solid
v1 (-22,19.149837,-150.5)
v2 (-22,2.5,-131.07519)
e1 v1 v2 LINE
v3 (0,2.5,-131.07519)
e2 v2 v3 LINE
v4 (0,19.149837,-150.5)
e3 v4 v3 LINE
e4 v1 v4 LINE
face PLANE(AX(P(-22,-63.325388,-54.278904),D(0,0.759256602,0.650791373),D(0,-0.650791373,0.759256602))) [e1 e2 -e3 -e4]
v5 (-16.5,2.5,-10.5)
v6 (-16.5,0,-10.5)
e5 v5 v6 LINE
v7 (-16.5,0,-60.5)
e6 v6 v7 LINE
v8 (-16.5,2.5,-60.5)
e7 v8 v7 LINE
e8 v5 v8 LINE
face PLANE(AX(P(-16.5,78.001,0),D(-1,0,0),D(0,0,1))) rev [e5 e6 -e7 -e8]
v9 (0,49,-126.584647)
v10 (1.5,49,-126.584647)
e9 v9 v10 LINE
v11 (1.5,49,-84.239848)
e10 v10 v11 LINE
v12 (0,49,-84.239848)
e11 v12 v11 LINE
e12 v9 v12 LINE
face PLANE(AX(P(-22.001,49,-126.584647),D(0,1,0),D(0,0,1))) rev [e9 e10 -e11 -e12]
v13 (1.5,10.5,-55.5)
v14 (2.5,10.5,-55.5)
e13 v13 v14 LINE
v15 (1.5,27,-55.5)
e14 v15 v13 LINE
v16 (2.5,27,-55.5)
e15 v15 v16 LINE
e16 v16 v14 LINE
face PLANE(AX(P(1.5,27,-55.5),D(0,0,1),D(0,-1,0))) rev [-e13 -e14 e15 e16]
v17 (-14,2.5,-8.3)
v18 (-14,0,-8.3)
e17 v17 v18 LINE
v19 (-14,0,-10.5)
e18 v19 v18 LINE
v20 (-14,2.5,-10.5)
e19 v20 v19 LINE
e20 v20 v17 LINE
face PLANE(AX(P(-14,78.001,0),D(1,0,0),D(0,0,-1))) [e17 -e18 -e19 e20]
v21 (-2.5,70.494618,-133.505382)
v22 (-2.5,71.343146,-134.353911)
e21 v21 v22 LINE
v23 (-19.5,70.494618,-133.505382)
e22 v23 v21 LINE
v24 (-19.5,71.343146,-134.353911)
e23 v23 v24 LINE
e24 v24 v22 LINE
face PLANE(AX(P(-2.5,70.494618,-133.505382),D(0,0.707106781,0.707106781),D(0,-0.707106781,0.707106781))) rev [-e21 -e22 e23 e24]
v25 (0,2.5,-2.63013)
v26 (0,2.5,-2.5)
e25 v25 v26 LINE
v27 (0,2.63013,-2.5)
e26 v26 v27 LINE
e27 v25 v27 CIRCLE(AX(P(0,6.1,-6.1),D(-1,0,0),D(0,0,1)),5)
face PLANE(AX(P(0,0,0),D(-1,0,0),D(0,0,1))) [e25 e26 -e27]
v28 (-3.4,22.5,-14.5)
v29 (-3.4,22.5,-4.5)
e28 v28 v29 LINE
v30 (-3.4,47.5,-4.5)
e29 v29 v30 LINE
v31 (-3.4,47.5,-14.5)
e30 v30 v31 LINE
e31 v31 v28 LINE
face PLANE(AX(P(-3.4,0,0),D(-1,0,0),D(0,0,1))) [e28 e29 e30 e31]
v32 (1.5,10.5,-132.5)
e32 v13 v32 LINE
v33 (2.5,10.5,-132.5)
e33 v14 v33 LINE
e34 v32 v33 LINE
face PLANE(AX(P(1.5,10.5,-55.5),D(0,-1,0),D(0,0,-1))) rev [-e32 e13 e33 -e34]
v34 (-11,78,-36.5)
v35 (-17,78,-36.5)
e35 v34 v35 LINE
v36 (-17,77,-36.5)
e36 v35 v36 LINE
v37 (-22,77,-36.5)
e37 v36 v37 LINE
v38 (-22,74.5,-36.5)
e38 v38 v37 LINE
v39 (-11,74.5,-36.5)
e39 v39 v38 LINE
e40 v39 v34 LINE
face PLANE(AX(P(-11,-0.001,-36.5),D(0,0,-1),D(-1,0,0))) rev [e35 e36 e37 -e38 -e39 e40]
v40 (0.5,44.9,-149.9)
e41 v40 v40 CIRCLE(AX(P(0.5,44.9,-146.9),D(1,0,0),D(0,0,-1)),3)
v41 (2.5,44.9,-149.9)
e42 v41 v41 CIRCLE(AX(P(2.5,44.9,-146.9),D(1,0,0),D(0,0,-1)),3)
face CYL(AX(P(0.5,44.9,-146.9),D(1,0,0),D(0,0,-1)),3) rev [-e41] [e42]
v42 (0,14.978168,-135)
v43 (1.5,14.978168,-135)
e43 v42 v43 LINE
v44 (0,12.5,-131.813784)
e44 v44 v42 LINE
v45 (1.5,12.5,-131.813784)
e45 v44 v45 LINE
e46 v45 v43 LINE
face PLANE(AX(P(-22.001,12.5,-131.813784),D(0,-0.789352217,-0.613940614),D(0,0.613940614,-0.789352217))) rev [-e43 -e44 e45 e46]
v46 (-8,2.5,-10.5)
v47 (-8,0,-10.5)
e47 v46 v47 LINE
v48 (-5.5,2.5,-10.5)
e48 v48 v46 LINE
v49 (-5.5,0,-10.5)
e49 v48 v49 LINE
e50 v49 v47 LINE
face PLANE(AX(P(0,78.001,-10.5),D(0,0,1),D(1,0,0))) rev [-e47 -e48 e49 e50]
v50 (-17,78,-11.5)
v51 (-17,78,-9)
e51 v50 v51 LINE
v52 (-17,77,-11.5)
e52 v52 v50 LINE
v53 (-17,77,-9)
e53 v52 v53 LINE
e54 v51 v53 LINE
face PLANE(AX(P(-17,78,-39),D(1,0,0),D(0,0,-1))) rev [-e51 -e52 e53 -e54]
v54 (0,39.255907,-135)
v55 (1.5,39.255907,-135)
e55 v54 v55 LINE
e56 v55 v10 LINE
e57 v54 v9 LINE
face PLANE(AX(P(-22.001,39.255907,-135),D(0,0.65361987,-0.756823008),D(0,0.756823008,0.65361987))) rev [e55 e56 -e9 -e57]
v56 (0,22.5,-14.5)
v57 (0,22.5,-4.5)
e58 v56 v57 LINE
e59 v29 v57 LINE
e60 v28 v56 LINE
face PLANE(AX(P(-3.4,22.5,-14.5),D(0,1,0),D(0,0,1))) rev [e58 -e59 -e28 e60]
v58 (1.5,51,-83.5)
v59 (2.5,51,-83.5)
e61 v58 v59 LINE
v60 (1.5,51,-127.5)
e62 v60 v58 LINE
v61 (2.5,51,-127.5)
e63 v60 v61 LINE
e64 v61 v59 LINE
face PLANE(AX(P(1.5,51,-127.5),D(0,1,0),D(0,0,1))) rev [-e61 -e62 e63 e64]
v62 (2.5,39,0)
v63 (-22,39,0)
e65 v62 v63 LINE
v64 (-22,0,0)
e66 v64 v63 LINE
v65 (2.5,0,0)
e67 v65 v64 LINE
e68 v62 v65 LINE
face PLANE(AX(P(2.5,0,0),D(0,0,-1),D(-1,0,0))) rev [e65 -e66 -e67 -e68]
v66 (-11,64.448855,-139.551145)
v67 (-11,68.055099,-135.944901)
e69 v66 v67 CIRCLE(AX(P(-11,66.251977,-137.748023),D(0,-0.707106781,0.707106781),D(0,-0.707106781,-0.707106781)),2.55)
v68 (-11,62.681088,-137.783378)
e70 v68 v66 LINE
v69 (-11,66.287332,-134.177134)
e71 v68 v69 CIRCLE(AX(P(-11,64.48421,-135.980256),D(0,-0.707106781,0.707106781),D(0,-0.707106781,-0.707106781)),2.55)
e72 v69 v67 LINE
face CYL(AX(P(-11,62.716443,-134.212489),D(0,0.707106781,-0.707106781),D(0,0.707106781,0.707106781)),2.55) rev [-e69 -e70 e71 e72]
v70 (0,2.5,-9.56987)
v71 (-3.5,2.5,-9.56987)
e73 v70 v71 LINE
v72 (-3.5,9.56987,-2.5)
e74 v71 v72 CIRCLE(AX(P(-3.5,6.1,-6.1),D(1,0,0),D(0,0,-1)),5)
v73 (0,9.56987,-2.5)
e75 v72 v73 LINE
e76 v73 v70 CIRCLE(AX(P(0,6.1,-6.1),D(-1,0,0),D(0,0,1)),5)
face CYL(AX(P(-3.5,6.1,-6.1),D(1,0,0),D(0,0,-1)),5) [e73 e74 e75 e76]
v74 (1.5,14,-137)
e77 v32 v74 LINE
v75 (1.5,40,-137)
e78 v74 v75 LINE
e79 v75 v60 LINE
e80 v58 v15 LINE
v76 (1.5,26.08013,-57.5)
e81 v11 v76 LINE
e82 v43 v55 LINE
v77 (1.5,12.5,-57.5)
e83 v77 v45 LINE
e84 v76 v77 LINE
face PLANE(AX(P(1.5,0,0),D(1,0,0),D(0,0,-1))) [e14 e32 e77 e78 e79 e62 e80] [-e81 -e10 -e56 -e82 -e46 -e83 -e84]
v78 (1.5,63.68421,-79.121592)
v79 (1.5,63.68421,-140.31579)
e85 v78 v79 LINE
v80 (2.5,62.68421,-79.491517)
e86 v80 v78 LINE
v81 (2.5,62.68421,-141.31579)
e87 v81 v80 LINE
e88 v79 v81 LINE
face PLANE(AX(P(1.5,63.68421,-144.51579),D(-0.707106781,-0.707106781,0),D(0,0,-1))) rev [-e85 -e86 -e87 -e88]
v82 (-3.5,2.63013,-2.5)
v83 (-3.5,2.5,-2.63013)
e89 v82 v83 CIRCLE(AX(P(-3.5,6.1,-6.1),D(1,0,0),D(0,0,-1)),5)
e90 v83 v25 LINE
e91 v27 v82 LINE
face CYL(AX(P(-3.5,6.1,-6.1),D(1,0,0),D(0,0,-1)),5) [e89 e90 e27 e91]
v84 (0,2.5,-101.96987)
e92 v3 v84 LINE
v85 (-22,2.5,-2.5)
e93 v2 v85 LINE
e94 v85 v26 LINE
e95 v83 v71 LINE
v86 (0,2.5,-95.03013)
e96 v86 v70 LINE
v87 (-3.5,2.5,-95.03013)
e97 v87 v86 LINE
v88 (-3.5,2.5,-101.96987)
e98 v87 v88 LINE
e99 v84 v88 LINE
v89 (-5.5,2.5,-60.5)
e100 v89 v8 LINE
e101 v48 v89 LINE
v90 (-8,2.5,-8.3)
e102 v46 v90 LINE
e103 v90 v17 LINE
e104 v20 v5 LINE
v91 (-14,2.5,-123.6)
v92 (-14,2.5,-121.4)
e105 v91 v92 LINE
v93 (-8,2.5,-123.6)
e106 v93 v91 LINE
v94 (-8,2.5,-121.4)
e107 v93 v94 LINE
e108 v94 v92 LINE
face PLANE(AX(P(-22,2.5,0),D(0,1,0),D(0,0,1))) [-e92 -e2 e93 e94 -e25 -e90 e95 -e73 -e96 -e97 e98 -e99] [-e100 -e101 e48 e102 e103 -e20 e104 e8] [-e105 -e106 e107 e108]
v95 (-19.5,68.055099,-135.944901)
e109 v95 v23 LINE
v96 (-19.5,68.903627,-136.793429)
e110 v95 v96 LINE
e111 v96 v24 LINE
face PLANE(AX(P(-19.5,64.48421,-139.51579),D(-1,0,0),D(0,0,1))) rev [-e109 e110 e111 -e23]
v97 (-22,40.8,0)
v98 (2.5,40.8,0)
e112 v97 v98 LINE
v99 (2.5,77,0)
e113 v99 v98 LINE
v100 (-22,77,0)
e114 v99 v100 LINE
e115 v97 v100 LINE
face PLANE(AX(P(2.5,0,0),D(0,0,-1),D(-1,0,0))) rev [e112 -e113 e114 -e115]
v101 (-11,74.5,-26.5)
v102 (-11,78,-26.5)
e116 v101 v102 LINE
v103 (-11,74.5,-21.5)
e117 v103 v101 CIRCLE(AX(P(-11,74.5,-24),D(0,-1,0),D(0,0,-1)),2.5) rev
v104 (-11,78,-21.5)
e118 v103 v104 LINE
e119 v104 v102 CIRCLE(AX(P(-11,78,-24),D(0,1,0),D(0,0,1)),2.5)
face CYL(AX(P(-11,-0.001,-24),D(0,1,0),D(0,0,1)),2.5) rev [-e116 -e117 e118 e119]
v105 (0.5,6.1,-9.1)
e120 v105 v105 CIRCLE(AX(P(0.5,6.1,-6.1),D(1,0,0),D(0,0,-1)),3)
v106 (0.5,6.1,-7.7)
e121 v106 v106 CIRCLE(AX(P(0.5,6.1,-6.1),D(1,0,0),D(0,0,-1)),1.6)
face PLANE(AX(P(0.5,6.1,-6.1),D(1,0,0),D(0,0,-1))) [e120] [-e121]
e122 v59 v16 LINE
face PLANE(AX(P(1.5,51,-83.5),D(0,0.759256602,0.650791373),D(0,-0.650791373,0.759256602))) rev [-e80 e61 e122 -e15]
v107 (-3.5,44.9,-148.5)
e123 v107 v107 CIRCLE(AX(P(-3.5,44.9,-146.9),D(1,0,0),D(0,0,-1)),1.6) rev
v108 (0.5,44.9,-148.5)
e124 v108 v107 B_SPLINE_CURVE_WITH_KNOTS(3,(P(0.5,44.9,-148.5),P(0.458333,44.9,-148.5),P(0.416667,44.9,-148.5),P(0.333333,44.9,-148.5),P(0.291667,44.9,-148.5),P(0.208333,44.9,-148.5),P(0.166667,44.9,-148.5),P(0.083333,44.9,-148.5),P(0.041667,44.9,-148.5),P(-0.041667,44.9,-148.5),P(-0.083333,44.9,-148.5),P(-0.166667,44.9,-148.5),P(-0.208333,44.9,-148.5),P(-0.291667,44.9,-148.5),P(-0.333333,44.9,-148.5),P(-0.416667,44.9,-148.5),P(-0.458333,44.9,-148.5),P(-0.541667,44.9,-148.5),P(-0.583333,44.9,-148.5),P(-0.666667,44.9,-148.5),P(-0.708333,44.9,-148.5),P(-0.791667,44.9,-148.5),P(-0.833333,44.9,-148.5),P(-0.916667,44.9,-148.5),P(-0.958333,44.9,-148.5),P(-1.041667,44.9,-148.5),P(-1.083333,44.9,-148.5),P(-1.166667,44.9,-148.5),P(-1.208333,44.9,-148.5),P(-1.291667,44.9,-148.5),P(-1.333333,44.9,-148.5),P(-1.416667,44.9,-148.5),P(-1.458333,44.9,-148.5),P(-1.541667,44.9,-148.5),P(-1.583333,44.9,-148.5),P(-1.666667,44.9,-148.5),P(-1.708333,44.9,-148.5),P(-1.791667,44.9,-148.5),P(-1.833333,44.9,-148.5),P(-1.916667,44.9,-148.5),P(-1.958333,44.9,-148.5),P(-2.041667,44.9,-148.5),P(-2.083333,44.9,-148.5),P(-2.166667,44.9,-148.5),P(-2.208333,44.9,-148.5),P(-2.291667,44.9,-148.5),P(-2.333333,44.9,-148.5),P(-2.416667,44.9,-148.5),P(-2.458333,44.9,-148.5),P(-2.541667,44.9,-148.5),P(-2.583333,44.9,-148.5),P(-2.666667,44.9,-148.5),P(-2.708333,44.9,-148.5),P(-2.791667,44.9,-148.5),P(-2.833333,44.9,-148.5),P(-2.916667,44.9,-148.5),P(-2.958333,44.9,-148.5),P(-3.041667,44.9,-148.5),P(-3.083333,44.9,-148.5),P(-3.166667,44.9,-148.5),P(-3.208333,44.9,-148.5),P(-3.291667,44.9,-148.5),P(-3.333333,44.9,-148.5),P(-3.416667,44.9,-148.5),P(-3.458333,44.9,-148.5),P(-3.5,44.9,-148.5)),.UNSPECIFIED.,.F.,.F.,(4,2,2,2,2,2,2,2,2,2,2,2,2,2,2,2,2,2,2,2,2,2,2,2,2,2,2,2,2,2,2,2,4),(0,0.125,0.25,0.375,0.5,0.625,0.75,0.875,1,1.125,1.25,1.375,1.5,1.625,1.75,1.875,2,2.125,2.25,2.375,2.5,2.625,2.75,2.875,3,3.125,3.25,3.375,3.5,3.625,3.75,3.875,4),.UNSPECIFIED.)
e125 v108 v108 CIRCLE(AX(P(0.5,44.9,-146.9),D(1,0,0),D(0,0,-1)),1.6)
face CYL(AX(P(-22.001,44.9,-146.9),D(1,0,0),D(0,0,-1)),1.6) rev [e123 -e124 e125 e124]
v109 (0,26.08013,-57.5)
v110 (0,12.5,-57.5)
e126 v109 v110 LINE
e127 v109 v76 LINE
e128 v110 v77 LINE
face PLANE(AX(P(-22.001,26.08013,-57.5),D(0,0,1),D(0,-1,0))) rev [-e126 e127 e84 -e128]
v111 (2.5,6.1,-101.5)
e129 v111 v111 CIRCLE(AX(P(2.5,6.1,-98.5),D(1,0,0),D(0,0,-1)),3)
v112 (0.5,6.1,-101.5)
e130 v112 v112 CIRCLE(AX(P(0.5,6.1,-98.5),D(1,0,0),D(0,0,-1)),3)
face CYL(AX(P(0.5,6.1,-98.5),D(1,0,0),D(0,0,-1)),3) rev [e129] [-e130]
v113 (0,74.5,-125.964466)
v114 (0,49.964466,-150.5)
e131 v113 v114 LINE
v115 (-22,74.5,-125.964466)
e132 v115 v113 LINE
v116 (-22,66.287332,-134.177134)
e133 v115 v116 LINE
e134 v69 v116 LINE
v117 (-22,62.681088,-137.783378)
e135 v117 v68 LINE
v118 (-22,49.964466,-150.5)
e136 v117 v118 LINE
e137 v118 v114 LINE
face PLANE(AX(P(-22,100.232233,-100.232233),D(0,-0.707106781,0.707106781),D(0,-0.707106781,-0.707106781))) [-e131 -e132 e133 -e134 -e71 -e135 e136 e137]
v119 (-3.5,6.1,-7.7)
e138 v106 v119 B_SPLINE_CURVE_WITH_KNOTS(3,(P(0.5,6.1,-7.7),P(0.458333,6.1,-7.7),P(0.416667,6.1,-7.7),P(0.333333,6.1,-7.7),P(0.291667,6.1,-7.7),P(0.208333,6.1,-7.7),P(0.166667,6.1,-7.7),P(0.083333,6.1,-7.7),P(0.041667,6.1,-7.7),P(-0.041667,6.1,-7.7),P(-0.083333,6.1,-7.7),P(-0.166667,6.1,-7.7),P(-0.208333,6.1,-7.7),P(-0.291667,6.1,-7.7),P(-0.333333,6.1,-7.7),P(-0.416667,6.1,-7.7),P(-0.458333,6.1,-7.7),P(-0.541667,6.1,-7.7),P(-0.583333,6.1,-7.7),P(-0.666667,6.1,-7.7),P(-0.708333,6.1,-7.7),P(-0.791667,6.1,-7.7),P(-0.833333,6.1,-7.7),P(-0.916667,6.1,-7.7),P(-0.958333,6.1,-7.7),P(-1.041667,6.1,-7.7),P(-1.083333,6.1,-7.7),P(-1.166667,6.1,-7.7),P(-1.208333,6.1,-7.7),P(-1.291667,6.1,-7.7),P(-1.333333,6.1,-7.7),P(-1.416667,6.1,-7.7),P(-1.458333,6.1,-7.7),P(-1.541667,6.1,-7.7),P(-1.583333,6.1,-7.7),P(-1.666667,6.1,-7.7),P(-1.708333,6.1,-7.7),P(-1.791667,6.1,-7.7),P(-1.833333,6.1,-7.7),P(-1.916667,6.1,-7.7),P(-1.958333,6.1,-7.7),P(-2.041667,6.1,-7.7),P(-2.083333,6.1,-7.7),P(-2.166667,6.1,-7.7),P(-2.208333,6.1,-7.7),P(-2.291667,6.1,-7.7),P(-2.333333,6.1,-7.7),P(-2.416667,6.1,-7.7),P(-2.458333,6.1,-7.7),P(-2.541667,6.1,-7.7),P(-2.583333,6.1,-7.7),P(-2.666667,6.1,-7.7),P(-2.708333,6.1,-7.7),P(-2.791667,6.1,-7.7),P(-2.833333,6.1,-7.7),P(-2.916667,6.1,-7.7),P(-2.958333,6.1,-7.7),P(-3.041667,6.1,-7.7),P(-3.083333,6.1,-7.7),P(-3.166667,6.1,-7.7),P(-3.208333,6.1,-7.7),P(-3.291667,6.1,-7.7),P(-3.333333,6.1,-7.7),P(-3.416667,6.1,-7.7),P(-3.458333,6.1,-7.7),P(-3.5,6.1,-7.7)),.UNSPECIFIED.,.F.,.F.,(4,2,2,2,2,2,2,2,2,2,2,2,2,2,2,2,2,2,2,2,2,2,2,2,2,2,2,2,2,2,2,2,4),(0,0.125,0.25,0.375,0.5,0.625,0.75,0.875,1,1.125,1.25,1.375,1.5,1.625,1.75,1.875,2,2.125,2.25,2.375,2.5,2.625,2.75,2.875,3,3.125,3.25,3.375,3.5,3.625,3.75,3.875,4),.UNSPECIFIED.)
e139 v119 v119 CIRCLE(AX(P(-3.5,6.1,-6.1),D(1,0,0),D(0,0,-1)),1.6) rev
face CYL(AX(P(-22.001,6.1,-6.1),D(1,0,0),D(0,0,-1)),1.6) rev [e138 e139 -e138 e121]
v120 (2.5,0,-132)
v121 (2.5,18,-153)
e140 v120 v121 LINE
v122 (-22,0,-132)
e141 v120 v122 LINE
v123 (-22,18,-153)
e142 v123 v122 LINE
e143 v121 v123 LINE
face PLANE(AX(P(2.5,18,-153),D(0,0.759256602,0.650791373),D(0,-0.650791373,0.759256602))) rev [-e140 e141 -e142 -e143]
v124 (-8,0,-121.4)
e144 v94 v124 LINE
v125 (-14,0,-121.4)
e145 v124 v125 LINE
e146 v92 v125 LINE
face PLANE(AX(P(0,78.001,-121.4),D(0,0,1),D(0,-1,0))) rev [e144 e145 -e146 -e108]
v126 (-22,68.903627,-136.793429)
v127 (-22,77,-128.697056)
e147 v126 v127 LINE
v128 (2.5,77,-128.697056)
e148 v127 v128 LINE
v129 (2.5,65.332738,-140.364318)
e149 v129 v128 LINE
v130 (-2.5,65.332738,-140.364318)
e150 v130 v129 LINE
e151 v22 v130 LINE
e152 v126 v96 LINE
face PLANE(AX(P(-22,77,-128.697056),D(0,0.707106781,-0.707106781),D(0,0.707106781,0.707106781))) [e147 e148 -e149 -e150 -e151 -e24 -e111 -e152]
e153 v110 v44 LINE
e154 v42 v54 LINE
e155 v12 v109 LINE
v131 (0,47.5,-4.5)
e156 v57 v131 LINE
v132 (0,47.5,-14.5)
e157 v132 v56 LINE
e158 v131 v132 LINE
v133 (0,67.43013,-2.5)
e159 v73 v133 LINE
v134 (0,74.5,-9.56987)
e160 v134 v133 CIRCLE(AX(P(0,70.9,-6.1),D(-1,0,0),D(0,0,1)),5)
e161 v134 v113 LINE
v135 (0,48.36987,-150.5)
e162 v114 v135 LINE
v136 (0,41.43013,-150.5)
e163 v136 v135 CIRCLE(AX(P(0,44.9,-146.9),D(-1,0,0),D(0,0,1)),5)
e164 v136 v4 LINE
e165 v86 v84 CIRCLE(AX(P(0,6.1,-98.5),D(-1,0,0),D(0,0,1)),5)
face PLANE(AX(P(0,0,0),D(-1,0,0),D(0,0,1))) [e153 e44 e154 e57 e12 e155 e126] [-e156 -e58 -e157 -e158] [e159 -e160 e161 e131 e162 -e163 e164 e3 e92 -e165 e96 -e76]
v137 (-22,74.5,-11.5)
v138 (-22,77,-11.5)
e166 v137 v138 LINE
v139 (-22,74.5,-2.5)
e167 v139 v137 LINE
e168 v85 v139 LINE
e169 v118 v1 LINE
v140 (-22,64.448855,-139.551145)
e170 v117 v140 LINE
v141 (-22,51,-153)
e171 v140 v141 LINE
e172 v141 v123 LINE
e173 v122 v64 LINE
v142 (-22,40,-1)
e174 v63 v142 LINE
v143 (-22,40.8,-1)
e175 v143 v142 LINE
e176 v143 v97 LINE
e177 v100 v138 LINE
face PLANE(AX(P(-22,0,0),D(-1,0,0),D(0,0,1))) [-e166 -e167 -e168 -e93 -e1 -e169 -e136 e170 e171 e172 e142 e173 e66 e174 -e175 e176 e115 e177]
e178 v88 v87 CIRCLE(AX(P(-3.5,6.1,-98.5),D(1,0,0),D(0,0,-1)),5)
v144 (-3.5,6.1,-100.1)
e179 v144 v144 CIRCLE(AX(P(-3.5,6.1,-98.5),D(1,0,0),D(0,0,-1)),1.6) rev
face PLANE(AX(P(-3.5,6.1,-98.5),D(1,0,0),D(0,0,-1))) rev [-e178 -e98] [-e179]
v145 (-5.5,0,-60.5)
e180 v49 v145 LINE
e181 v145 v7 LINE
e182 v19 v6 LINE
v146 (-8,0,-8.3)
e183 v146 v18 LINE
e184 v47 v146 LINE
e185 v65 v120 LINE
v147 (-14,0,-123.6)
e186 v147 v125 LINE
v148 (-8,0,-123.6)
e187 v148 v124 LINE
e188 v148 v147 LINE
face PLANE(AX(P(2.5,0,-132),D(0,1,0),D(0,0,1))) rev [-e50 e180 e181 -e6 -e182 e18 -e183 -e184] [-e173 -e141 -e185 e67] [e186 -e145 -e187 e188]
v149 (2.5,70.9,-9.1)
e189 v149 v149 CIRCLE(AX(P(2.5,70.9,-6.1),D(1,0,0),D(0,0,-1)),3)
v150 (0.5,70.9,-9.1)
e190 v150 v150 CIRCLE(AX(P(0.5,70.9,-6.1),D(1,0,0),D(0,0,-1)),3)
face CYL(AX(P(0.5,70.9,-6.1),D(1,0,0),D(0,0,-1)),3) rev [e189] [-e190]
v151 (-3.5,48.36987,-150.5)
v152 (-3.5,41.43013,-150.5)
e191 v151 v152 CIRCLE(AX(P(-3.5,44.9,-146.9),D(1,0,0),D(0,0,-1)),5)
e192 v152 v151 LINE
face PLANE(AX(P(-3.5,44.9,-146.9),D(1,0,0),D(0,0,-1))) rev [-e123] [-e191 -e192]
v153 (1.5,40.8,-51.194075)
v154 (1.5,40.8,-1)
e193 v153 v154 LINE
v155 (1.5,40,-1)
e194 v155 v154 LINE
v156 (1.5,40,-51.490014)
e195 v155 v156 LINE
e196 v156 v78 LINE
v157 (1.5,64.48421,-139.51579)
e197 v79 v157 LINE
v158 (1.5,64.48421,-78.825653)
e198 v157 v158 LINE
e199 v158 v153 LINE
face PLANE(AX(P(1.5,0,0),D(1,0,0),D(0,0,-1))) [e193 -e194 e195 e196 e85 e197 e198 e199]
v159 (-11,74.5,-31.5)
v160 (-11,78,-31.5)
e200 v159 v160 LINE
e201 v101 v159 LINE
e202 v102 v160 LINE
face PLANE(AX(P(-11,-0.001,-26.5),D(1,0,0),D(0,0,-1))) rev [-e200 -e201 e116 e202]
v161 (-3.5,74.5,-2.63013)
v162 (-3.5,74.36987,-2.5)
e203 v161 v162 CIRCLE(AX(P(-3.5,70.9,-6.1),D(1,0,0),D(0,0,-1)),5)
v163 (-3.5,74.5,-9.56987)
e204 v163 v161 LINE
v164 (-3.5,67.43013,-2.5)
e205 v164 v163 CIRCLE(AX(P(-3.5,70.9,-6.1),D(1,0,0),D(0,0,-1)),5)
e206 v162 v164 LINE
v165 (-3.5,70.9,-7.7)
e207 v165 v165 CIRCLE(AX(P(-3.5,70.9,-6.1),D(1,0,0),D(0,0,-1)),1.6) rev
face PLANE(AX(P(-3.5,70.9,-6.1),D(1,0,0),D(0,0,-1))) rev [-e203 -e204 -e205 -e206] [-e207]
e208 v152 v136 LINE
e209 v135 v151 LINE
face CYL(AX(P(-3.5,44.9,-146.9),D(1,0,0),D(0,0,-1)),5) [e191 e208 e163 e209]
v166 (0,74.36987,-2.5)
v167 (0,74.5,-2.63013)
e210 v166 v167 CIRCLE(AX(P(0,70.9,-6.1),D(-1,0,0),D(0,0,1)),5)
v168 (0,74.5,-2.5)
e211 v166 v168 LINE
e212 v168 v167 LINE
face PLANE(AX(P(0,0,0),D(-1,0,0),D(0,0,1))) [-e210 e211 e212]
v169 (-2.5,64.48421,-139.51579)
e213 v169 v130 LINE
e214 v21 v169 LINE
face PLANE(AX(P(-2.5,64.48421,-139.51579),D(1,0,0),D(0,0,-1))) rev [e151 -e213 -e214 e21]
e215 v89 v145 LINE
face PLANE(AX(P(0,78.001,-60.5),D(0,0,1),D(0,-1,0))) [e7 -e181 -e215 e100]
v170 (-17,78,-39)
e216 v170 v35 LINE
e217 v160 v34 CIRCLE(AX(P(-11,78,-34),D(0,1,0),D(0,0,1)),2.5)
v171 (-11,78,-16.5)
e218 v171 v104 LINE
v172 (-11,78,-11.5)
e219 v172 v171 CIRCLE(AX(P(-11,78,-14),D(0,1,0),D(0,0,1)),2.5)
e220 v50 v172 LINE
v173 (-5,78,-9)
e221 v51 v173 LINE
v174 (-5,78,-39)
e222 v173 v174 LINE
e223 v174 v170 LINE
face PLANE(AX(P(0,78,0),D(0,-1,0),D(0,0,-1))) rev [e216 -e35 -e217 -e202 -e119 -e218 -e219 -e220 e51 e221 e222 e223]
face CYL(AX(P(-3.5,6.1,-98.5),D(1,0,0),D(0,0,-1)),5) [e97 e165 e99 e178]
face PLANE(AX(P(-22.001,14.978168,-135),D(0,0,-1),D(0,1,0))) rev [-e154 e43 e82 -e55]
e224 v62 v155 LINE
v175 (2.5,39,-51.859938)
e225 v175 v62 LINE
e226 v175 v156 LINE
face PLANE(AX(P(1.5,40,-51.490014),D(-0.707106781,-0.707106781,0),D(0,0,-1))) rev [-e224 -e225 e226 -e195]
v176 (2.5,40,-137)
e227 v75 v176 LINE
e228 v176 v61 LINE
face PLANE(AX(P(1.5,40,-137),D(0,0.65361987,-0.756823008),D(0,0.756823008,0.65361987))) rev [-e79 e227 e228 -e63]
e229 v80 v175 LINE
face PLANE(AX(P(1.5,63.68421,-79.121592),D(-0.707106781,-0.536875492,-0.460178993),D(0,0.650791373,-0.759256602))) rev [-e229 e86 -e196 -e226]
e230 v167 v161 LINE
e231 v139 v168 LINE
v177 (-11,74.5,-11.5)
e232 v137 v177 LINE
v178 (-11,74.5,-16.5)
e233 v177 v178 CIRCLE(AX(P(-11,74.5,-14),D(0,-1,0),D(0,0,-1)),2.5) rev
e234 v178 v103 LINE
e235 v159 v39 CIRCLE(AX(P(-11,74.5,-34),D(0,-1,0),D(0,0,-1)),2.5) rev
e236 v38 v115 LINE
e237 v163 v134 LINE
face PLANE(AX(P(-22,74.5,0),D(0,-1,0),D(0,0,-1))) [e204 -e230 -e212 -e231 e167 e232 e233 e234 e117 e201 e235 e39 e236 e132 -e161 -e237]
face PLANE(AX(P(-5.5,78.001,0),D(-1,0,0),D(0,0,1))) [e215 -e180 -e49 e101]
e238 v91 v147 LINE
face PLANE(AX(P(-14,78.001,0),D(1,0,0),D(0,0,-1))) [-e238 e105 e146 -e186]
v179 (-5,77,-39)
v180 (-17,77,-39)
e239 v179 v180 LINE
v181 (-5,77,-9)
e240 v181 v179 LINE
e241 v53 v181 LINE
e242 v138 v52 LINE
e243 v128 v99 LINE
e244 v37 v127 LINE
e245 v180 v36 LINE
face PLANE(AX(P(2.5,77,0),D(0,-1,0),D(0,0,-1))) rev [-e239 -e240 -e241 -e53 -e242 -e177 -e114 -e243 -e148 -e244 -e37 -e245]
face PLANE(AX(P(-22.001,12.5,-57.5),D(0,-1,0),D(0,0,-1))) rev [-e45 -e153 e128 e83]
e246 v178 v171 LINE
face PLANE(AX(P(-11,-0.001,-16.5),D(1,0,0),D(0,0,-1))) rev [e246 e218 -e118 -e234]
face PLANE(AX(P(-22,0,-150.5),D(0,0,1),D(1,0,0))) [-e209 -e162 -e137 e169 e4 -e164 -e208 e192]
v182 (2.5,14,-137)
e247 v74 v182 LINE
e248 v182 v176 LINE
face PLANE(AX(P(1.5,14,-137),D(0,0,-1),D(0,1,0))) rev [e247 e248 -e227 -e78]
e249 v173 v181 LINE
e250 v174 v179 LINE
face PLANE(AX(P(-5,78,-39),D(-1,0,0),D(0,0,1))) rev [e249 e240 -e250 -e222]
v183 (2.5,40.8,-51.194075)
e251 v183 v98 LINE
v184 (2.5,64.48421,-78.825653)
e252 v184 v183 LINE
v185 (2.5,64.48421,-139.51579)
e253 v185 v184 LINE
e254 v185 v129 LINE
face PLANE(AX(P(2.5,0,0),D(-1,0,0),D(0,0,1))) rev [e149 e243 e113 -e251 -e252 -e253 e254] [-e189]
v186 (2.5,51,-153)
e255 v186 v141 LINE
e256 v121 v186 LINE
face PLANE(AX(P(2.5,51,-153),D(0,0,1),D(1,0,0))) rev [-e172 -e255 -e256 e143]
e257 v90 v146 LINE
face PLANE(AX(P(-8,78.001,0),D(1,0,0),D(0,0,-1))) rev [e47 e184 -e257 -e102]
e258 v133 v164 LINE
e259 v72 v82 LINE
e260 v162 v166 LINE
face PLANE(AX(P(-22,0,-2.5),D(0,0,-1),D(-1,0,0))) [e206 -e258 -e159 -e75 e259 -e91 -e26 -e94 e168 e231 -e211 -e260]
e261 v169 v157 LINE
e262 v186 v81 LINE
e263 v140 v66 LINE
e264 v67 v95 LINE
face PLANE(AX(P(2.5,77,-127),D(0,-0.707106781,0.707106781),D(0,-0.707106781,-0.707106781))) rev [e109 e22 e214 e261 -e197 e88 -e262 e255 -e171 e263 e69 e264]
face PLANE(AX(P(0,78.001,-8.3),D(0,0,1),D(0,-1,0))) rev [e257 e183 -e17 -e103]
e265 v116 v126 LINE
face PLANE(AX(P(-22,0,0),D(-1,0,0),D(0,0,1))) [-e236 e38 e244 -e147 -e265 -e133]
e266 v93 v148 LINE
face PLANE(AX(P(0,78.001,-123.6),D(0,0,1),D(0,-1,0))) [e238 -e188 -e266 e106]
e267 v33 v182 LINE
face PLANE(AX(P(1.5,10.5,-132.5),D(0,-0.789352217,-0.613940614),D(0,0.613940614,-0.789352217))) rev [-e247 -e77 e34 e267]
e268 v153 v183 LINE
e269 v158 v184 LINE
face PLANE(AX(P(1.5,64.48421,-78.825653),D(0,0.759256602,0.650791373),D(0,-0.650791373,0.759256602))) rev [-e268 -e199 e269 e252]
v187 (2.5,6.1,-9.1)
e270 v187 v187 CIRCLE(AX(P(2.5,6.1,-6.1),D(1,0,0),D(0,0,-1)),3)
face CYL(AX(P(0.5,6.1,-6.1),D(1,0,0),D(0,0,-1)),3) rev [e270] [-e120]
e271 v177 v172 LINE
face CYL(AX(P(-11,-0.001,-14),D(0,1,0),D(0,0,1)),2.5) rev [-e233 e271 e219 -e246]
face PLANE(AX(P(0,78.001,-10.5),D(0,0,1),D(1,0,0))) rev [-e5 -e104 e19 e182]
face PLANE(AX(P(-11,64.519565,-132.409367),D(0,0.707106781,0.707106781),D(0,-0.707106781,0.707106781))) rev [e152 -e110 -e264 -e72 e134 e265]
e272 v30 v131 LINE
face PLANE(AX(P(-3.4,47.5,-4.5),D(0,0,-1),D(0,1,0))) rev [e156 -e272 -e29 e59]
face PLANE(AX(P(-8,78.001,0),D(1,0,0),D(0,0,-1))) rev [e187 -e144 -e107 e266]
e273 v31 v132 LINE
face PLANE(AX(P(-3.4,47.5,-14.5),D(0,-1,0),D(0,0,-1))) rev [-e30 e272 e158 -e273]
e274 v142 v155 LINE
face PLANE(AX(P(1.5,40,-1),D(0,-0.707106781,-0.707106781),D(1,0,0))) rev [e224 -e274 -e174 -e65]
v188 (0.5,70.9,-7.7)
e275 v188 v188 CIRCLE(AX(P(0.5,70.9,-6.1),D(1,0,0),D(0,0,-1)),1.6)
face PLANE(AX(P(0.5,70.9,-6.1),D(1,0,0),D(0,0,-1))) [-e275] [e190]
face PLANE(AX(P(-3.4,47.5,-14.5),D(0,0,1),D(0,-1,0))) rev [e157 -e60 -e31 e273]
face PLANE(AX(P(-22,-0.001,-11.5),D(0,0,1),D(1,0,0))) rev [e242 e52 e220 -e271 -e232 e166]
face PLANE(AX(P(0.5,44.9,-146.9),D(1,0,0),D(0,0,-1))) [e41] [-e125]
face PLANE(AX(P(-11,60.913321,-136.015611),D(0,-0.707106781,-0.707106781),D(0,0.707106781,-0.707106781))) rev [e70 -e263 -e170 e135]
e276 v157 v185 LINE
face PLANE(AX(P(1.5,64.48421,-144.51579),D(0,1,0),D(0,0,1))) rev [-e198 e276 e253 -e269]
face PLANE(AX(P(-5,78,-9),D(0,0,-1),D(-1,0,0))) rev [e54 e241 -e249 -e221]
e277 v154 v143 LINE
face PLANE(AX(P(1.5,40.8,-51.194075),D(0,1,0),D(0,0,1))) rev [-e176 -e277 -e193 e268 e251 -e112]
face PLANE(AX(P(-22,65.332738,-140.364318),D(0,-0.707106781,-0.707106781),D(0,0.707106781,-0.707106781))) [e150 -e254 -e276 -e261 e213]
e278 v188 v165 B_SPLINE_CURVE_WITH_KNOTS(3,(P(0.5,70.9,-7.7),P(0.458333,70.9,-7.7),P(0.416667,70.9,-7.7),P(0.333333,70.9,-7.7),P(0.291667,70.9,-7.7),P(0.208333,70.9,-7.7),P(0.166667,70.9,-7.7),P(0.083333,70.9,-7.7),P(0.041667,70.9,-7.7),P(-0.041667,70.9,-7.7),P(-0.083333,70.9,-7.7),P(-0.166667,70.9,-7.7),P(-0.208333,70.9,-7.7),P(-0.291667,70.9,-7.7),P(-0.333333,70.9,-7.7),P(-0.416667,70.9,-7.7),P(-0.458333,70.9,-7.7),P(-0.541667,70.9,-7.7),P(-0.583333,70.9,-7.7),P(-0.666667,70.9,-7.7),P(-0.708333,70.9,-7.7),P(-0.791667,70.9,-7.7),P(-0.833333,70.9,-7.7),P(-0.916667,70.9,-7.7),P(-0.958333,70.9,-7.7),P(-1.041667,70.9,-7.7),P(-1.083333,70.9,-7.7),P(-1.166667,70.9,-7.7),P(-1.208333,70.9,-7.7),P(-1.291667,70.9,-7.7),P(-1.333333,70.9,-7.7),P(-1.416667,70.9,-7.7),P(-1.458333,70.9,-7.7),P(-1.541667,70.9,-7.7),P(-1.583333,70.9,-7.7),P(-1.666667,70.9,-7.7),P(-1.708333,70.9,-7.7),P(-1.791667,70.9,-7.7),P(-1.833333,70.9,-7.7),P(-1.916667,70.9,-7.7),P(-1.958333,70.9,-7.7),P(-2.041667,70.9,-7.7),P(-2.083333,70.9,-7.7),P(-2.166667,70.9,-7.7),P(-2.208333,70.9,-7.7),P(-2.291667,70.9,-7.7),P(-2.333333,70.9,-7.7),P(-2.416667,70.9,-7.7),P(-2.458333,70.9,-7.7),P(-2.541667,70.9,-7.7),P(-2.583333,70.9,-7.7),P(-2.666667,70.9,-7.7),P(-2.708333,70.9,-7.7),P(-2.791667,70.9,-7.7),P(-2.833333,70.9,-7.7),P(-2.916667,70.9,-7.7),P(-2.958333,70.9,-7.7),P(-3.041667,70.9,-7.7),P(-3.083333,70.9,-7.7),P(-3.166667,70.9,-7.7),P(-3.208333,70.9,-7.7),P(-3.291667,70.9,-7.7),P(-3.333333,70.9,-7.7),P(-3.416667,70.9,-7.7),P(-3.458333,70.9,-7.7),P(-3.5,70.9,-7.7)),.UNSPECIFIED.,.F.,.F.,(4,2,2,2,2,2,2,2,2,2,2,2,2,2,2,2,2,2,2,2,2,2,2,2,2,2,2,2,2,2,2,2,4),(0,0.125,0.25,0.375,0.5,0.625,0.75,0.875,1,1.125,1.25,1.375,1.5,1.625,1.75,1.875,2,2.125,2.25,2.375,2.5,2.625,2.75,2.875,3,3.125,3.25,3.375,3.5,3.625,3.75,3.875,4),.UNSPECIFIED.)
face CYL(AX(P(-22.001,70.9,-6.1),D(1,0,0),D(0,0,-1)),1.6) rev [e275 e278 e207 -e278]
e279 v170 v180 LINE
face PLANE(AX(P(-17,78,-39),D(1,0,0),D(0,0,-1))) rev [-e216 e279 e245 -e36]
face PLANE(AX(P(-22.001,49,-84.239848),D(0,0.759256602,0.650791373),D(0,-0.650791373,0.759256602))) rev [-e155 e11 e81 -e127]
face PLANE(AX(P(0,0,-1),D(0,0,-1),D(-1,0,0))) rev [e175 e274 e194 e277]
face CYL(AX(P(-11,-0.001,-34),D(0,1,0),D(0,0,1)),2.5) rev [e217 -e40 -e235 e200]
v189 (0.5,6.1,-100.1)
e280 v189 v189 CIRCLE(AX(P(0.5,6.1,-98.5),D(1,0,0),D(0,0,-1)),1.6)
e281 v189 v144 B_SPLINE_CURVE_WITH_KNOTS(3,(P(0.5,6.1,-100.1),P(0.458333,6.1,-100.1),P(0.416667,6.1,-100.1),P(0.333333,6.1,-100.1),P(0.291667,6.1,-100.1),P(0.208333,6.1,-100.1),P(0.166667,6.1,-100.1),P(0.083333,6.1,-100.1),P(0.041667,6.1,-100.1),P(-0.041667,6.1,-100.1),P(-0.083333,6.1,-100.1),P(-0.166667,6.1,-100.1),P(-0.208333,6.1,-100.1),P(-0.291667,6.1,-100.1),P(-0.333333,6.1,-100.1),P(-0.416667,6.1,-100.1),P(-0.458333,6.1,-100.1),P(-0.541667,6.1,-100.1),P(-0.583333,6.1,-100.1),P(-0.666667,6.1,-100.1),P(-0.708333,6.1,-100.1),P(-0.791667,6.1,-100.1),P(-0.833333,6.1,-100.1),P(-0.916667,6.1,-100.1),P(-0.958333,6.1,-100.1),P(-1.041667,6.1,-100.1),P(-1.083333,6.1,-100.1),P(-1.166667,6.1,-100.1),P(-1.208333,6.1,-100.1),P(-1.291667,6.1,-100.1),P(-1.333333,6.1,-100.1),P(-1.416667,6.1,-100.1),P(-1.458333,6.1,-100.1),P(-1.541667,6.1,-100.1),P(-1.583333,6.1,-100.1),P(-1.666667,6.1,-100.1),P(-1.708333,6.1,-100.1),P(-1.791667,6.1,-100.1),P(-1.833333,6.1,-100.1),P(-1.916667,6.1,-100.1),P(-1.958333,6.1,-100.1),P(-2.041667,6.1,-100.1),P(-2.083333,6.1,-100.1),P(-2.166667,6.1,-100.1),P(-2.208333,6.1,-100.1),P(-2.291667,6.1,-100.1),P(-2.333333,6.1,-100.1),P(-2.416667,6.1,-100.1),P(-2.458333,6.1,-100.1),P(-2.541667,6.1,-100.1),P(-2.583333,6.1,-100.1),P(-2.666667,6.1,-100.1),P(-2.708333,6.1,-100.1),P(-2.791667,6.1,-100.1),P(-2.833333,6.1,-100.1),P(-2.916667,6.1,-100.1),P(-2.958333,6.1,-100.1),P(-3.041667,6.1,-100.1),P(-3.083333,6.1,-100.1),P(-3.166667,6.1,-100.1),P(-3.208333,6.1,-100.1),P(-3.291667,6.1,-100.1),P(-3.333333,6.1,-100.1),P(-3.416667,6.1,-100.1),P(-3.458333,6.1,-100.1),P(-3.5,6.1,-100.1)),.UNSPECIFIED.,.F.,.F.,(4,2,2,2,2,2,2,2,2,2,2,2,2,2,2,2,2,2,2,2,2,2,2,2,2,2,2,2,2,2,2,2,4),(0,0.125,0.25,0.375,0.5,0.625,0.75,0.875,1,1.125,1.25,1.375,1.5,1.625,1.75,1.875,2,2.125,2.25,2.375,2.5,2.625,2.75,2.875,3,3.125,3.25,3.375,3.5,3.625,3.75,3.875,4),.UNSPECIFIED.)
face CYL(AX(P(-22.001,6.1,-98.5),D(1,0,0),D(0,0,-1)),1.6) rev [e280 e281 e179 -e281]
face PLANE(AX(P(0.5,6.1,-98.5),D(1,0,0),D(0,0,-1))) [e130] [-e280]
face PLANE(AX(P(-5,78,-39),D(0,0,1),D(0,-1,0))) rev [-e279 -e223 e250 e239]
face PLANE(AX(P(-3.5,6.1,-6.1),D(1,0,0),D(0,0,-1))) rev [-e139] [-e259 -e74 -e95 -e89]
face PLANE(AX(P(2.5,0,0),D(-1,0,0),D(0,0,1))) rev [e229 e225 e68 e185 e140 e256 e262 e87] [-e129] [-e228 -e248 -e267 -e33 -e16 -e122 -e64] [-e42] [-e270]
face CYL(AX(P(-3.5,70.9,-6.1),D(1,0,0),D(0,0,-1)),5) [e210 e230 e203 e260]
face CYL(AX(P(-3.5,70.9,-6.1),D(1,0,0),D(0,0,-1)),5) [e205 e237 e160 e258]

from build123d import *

# Parameters (mm, degrees)
BASE_DEPTH            = 2.5
BOSS_EXTRUDE6_DEPTH   = 22
SKETCH17_W            = 12
SKETCH17_H            = 30
BOSS_EXTRUDE8_DEPTH   = 1
CUT_EXTRUDE2_REACH    = 175.139
BOSS_EXTRUDE9_DEPTH   = 24.5
SKETCH20_W            = 17
SKETCH20_H            = 8.5
CUT_EXTRUDE5_DEPTH    = 1.2
CUT_EXTRUDE6_DEPTH    = 5
SKETCH28_R            = 5
BOSS_EXTRUDE11_DEPTH  = 6
SKETCH29_R            = 3
CUT_EXTRUDE11_DEPTH   = 2
CUT_EXTRUDE12_REACH   = 175.203
SKETCH30_R            = 1.6
SKETCH31_W            = 10
SKETCH31_H            = 25
BATTERY_SUPPORT_DEPTH = 3.4
CUT_EXTRUDE9_DEPTH    = 1
CUT_EXTRUDE10_REACH   = 175.336
CUT_EXTRUDE13_DEPTH   = 1
SKETCH33_W            = 23.5
SKETCH33_H            = 0.8
CUT_EXTRUDE14_DEPTH   = 1
CHAMFER1_SIZE         = 1
CUT_EXTRUDE7_REACH    = 175.139
SKETCH23_W            = 6
SKETCH23_H            = 2.2


with BuildPart() as part:
    # Sketch1 → Base (new body)
    with BuildSketch(Plane(origin=(0, 0, 0), x_dir=(0, 0, -1), z_dir=(1, 0, 0))):
        Polygon((0, 0), (0, 77), (127, 77), (153, 51), (153, 18), (132, 0), align=None)
    extrude(amount=BASE_DEPTH)

    # Sketch11 → Boss-Extrude6 (add)
    with BuildSketch(Plane.ZY):
        Polygon((-153, 18), (-132, 0), (0, 0), (0, 77), (-127, 77), (-153, 51), align=None)
        Polygon((-150.5, 19.149837306), (-131.075189809, 2.5), (-2.5, 2.5), (-2.5, 74.5), (-125.964466094, 74.5), (-150.5, 49.964466094), align=None, mode=Mode.SUBTRACT)
    extrude(amount=BOSS_EXTRUDE6_DEPTH)

    # Sketch17 → Boss-Extrude8 (add)
    with BuildSketch(Plane(origin=(0, 77, 0), x_dir=(1, 0, 0), z_dir=(0, 1, 0))):
        with Locations((-11, 24)):
            Rectangle(SKETCH17_W, SKETCH17_H)
    extrude(amount=BOSS_EXTRUDE8_DEPTH)

    # Sketch13 → Cut-Extrude2 (cut, up to next)
    with BuildSketch(Plane(origin=(0, 78, 0), x_dir=(1, 0, 0), z_dir=(0, 1, 0)), mode=Mode.PRIVATE) as cut_extrude2_sk1:
        with BuildLine():
            Line((-22, 11.5), (-11, 11.5))
            ThreePointArc((-11, 11.5), (-8.5, 14), (-11, 16.5))
            Line((-11, 16.5), (-11, 21.5))
            ThreePointArc((-11, 21.5), (-8.5, 24), (-11, 26.5))
            Line((-11, 26.5), (-11, 31.5))
            ThreePointArc((-11, 31.5), (-8.5, 34), (-11, 36.5))
            Line((-11, 36.5), (-22, 36.5))
            Line((-22, 36.5), (-22, 11.5))
        make_face()
    cut_extrude2_tool1 = extrude(cut_extrude2_sk1.sketch, amount=-CUT_EXTRUDE2_REACH, mode=Mode.PRIVATE) & part.part
    add(cut_extrude2_tool1.solids().sort_by_distance((-15.865292, 78, -24))[0], mode=Mode.SUBTRACT)

    # Sketch19 → Boss-Extrude9 (add)
    with BuildSketch(Plane(origin=(2.5, 0, 0), x_dir=(0, 0, -1), z_dir=(1, 0, 0))):
        Polygon((127, 77), (128.697056275, 77), (140.364318164, 65.33273811), (139.515790027, 64.484209973), align=None)
    extrude(amount=-BOSS_EXTRUDE9_DEPTH)

    # Sketch20 → Cut-Extrude5 (cut)
    with BuildSketch(Plane(origin=(0, 102.848528137, -102.848528137), x_dir=(-1, 0, 0), z_dir=(0, 0.7071067811865467, -0.7071067811865485))):
        with Locations((11, -48.805339059)):
            Rectangle(SKETCH20_W, SKETCH20_H)
    extrude(amount=-CUT_EXTRUDE5_DEPTH, mode=Mode.SUBTRACT)

    # Sketch21 → Cut-Extrude6 (cut, symmetric)
    with BuildSketch(Plane(origin=(0, 102, -102), x_dir=(-1, 0, 0), z_dir=(0, 0.7071067811865478, -0.7071067811865472))):
        with BuildLine():
            Line((11, -48.005339059), (22, -48.005339059))
            Line((22, -48.005339059), (22, -53.105339059))
            Line((22, -53.105339059), (11, -53.105339059))
            ThreePointArc((11, -53.105339059), (8.45, -50.555339059), (11, -48.005339059))
        make_face()
    extrude(amount=CUT_EXTRUDE6_DEPTH, both=True, mode=Mode.SUBTRACT)

    # Sketch28 → Boss-Extrude11 (add)
    with BuildSketch(Plane(origin=(2.5, 0, 0), x_dir=(0, 0, -1), z_dir=(1, 0, 0))):
        with Locations((6.1, 70.9)):
            Circle(SKETCH28_R)
        with Locations((146.9, 44.9)):
            Circle(SKETCH28_R)
        with Locations((98.5, 6.1)):
            Circle(SKETCH28_R)
        with Locations((6.1, 6.1)):
            Circle(SKETCH28_R)
    extrude(amount=-BOSS_EXTRUDE11_DEPTH)

    # Sketch29 → Cut-Extrude11 (cut)
    with BuildSketch(Plane(origin=(2.5, 0, 0), x_dir=(0, 0, -1), z_dir=(1, 0, 0))):
        with Locations((6.1, 70.9)):
            Circle(SKETCH29_R)
        with Locations((146.9, 44.9)):
            Circle(SKETCH29_R)
        with Locations((98.5, 6.1)):
            Circle(SKETCH29_R)
        with Locations((6.1, 6.1)):
            Circle(SKETCH29_R)
    extrude(amount=-CUT_EXTRUDE11_DEPTH, mode=Mode.SUBTRACT)

    # Sketch30 → Cut-Extrude12 (cut, up to next)
    with BuildSketch(Plane(origin=(0.5, 0, 0), x_dir=(0, 0, -1), z_dir=(1, 0, 0)), mode=Mode.PRIVATE) as cut_extrude12_sk1:
        with Locations((6.1, 70.9)):
            Circle(SKETCH30_R)
    cut_extrude12_tool1 = extrude(cut_extrude12_sk1.sketch, amount=-CUT_EXTRUDE12_REACH, mode=Mode.PRIVATE) & part.part
    # Sketch30 → Cut-Extrude12 (cut, up to next)
    with BuildSketch(Plane(origin=(0.5, 0, 0), x_dir=(0, 0, -1), z_dir=(1, 0, 0)), mode=Mode.PRIVATE) as cut_extrude12_sk2:
        with Locations((6.1, 6.1)):
            Circle(SKETCH30_R)
    cut_extrude12_tool2 = extrude(cut_extrude12_sk2.sketch, amount=-CUT_EXTRUDE12_REACH, mode=Mode.PRIVATE) & part.part
    # Sketch30 → Cut-Extrude12 (cut, up to next)
    with BuildSketch(Plane(origin=(0.5, 0, 0), x_dir=(0, 0, -1), z_dir=(1, 0, 0)), mode=Mode.PRIVATE) as cut_extrude12_sk3:
        with Locations((146.9, 44.9)):
            Circle(SKETCH30_R)
    cut_extrude12_tool3 = extrude(cut_extrude12_sk3.sketch, amount=-CUT_EXTRUDE12_REACH, mode=Mode.PRIVATE) & part.part
    # Sketch30 → Cut-Extrude12 (cut, up to next)
    with BuildSketch(Plane(origin=(0.5, 0, 0), x_dir=(0, 0, -1), z_dir=(1, 0, 0)), mode=Mode.PRIVATE) as cut_extrude12_sk4:
        with Locations((98.5, 6.1)):
            Circle(SKETCH30_R)
    cut_extrude12_tool4 = extrude(cut_extrude12_sk4.sketch, amount=-CUT_EXTRUDE12_REACH, mode=Mode.PRIVATE) & part.part
    add(cut_extrude12_tool1.solids().sort_by_distance((0.5, 70.9, -6.1))[0], mode=Mode.SUBTRACT)
    add(cut_extrude12_tool2.solids().sort_by_distance((0.5, 6.1, -6.1))[0], mode=Mode.SUBTRACT)
    add(cut_extrude12_tool3.solids().sort_by_distance((0.5, 44.9, -146.9))[0], mode=Mode.SUBTRACT)
    add(cut_extrude12_tool4.solids().sort_by_distance((0.5, 6.1, -98.5))[0], mode=Mode.SUBTRACT)

    # Sketch31 → Battery_Support (add)
    with BuildSketch(Plane.ZY):
        with Locations((-9.5, 35)):
            Rectangle(SKETCH31_W, SKETCH31_H)
    extrude(amount=BATTERY_SUPPORT_DEPTH)

    # Sketch25 → Cut-Extrude9 (cut)
    with BuildSketch(Plane(origin=(2.5, 0, 0), x_dir=(0, 0, -1), z_dir=(1, 0, 0))):
        Polygon((55.5, 10.5), (132.5, 10.5), (137, 14), (137, 40), (127.5, 51), (83.5, 51), (55.5, 27), align=None)
    extrude(amount=-CUT_EXTRUDE9_DEPTH, mode=Mode.SUBTRACT)

    # Sketch26 → Cut-Extrude10 (cut, up to next)
    with BuildSketch(Plane(origin=(1.5, 0, 0), x_dir=(0, 0, -1), z_dir=(1, 0, 0)), mode=Mode.PRIVATE) as cut_extrude10_sk1:
        Polygon((57.5, 26.080130155), (57.5, 12.5), (131.8137845, 12.5), (135, 14.978167611), (135, 39.255906978), (126.584646936, 49), (84.239848152, 49), align=None)
    cut_extrude10_tool1 = extrude(cut_extrude10_sk1.sketch, amount=-CUT_EXTRUDE10_REACH, mode=Mode.PRIVATE) & part.part
    add(cut_extrude10_tool1.solids().sort_by_distance((1.5, 29.217081, -99.285701))[0], mode=Mode.SUBTRACT)

    # Sketch32 → Cut-Extrude13 (cut)
    with BuildSketch(Plane(origin=(2.5, 0, 0), x_dir=(0, 0, -1), z_dir=(1, 0, 0))):
        Polygon((144.515790027, 63.684209973), (79.121592497, 63.684209973), (51.490014195, 40), (0, 40), (0, 40.8), (51.194074935, 40.8), (78.825653236, 64.484209973), (144.515790027, 64.484209973), align=None)
    extrude(amount=-CUT_EXTRUDE13_DEPTH, mode=Mode.SUBTRACT)

    # Sketch33 → Cut-Extrude14 (cut)
    with BuildSketch(Plane.XY):
        with Locations((-10.25, 40.4)):
            Rectangle(SKETCH33_W, SKETCH33_H)
    extrude(amount=-CUT_EXTRUDE14_DEPTH, mode=Mode.SUBTRACT)

    # Chamfer1
    chamfer1_edges = [part.edges().sort_by_distance(p)[0] for p in [
        (-9.75, 40, 0),
        (2.5, 40, -25.745007098),
        (2.5, 51.842104986, -65.305803346),
        (2.5, 63.684209973, -109.718691262),
    ]]
    chamfer(chamfer1_edges, length=CHAMFER1_SIZE - 0.0001)  # a hair under: the kernel refuses the full size

    # Sketch23 → Cut-Extrude7 (cut, up to next)
    with BuildSketch(Plane.XZ, mode=Mode.PRIVATE) as cut_extrude7_sk1:
        Polygon((-5.5, -10.5), (-8, -10.5), (-14, -10.5), (-16.5, -10.5), (-16.5, -60.5), (-5.5, -60.5), align=None)
    cut_extrude7_tool1 = extrude(cut_extrude7_sk1.sketch, amount=-CUT_EXTRUDE7_REACH, mode=Mode.PRIVATE) & part.part
    # Sketch23 → Cut-Extrude7 (cut, up to next)
    with BuildSketch(Plane.XZ, mode=Mode.PRIVATE) as cut_extrude7_sk2:
        with Locations((-11, -9.4)):
            Rectangle(SKETCH23_W, SKETCH23_H)
    cut_extrude7_tool2 = extrude(cut_extrude7_sk2.sketch, amount=-CUT_EXTRUDE7_REACH, mode=Mode.PRIVATE) & part.part
    # Sketch23 → Cut-Extrude7 (cut, up to next)
    with BuildSketch(Plane.XZ, mode=Mode.PRIVATE) as cut_extrude7_sk3:
        with Locations((-11, -122.5)):
            Rectangle(SKETCH23_W, SKETCH23_H)
    cut_extrude7_tool3 = extrude(cut_extrude7_sk3.sketch, amount=-CUT_EXTRUDE7_REACH, mode=Mode.PRIVATE) & part.part
    add(cut_extrude7_tool1.solids().sort_by_distance((-11, 0, -35.5))[0], mode=Mode.SUBTRACT)
    add(cut_extrude7_tool2.solids().sort_by_distance((-11, 0, -9.4))[0], mode=Mode.SUBTRACT)
    add(cut_extrude7_tool3.solids().sort_by_distance((-11, 0, -122.5))[0], mode=Mode.SUBTRACT)


solid = part.part
